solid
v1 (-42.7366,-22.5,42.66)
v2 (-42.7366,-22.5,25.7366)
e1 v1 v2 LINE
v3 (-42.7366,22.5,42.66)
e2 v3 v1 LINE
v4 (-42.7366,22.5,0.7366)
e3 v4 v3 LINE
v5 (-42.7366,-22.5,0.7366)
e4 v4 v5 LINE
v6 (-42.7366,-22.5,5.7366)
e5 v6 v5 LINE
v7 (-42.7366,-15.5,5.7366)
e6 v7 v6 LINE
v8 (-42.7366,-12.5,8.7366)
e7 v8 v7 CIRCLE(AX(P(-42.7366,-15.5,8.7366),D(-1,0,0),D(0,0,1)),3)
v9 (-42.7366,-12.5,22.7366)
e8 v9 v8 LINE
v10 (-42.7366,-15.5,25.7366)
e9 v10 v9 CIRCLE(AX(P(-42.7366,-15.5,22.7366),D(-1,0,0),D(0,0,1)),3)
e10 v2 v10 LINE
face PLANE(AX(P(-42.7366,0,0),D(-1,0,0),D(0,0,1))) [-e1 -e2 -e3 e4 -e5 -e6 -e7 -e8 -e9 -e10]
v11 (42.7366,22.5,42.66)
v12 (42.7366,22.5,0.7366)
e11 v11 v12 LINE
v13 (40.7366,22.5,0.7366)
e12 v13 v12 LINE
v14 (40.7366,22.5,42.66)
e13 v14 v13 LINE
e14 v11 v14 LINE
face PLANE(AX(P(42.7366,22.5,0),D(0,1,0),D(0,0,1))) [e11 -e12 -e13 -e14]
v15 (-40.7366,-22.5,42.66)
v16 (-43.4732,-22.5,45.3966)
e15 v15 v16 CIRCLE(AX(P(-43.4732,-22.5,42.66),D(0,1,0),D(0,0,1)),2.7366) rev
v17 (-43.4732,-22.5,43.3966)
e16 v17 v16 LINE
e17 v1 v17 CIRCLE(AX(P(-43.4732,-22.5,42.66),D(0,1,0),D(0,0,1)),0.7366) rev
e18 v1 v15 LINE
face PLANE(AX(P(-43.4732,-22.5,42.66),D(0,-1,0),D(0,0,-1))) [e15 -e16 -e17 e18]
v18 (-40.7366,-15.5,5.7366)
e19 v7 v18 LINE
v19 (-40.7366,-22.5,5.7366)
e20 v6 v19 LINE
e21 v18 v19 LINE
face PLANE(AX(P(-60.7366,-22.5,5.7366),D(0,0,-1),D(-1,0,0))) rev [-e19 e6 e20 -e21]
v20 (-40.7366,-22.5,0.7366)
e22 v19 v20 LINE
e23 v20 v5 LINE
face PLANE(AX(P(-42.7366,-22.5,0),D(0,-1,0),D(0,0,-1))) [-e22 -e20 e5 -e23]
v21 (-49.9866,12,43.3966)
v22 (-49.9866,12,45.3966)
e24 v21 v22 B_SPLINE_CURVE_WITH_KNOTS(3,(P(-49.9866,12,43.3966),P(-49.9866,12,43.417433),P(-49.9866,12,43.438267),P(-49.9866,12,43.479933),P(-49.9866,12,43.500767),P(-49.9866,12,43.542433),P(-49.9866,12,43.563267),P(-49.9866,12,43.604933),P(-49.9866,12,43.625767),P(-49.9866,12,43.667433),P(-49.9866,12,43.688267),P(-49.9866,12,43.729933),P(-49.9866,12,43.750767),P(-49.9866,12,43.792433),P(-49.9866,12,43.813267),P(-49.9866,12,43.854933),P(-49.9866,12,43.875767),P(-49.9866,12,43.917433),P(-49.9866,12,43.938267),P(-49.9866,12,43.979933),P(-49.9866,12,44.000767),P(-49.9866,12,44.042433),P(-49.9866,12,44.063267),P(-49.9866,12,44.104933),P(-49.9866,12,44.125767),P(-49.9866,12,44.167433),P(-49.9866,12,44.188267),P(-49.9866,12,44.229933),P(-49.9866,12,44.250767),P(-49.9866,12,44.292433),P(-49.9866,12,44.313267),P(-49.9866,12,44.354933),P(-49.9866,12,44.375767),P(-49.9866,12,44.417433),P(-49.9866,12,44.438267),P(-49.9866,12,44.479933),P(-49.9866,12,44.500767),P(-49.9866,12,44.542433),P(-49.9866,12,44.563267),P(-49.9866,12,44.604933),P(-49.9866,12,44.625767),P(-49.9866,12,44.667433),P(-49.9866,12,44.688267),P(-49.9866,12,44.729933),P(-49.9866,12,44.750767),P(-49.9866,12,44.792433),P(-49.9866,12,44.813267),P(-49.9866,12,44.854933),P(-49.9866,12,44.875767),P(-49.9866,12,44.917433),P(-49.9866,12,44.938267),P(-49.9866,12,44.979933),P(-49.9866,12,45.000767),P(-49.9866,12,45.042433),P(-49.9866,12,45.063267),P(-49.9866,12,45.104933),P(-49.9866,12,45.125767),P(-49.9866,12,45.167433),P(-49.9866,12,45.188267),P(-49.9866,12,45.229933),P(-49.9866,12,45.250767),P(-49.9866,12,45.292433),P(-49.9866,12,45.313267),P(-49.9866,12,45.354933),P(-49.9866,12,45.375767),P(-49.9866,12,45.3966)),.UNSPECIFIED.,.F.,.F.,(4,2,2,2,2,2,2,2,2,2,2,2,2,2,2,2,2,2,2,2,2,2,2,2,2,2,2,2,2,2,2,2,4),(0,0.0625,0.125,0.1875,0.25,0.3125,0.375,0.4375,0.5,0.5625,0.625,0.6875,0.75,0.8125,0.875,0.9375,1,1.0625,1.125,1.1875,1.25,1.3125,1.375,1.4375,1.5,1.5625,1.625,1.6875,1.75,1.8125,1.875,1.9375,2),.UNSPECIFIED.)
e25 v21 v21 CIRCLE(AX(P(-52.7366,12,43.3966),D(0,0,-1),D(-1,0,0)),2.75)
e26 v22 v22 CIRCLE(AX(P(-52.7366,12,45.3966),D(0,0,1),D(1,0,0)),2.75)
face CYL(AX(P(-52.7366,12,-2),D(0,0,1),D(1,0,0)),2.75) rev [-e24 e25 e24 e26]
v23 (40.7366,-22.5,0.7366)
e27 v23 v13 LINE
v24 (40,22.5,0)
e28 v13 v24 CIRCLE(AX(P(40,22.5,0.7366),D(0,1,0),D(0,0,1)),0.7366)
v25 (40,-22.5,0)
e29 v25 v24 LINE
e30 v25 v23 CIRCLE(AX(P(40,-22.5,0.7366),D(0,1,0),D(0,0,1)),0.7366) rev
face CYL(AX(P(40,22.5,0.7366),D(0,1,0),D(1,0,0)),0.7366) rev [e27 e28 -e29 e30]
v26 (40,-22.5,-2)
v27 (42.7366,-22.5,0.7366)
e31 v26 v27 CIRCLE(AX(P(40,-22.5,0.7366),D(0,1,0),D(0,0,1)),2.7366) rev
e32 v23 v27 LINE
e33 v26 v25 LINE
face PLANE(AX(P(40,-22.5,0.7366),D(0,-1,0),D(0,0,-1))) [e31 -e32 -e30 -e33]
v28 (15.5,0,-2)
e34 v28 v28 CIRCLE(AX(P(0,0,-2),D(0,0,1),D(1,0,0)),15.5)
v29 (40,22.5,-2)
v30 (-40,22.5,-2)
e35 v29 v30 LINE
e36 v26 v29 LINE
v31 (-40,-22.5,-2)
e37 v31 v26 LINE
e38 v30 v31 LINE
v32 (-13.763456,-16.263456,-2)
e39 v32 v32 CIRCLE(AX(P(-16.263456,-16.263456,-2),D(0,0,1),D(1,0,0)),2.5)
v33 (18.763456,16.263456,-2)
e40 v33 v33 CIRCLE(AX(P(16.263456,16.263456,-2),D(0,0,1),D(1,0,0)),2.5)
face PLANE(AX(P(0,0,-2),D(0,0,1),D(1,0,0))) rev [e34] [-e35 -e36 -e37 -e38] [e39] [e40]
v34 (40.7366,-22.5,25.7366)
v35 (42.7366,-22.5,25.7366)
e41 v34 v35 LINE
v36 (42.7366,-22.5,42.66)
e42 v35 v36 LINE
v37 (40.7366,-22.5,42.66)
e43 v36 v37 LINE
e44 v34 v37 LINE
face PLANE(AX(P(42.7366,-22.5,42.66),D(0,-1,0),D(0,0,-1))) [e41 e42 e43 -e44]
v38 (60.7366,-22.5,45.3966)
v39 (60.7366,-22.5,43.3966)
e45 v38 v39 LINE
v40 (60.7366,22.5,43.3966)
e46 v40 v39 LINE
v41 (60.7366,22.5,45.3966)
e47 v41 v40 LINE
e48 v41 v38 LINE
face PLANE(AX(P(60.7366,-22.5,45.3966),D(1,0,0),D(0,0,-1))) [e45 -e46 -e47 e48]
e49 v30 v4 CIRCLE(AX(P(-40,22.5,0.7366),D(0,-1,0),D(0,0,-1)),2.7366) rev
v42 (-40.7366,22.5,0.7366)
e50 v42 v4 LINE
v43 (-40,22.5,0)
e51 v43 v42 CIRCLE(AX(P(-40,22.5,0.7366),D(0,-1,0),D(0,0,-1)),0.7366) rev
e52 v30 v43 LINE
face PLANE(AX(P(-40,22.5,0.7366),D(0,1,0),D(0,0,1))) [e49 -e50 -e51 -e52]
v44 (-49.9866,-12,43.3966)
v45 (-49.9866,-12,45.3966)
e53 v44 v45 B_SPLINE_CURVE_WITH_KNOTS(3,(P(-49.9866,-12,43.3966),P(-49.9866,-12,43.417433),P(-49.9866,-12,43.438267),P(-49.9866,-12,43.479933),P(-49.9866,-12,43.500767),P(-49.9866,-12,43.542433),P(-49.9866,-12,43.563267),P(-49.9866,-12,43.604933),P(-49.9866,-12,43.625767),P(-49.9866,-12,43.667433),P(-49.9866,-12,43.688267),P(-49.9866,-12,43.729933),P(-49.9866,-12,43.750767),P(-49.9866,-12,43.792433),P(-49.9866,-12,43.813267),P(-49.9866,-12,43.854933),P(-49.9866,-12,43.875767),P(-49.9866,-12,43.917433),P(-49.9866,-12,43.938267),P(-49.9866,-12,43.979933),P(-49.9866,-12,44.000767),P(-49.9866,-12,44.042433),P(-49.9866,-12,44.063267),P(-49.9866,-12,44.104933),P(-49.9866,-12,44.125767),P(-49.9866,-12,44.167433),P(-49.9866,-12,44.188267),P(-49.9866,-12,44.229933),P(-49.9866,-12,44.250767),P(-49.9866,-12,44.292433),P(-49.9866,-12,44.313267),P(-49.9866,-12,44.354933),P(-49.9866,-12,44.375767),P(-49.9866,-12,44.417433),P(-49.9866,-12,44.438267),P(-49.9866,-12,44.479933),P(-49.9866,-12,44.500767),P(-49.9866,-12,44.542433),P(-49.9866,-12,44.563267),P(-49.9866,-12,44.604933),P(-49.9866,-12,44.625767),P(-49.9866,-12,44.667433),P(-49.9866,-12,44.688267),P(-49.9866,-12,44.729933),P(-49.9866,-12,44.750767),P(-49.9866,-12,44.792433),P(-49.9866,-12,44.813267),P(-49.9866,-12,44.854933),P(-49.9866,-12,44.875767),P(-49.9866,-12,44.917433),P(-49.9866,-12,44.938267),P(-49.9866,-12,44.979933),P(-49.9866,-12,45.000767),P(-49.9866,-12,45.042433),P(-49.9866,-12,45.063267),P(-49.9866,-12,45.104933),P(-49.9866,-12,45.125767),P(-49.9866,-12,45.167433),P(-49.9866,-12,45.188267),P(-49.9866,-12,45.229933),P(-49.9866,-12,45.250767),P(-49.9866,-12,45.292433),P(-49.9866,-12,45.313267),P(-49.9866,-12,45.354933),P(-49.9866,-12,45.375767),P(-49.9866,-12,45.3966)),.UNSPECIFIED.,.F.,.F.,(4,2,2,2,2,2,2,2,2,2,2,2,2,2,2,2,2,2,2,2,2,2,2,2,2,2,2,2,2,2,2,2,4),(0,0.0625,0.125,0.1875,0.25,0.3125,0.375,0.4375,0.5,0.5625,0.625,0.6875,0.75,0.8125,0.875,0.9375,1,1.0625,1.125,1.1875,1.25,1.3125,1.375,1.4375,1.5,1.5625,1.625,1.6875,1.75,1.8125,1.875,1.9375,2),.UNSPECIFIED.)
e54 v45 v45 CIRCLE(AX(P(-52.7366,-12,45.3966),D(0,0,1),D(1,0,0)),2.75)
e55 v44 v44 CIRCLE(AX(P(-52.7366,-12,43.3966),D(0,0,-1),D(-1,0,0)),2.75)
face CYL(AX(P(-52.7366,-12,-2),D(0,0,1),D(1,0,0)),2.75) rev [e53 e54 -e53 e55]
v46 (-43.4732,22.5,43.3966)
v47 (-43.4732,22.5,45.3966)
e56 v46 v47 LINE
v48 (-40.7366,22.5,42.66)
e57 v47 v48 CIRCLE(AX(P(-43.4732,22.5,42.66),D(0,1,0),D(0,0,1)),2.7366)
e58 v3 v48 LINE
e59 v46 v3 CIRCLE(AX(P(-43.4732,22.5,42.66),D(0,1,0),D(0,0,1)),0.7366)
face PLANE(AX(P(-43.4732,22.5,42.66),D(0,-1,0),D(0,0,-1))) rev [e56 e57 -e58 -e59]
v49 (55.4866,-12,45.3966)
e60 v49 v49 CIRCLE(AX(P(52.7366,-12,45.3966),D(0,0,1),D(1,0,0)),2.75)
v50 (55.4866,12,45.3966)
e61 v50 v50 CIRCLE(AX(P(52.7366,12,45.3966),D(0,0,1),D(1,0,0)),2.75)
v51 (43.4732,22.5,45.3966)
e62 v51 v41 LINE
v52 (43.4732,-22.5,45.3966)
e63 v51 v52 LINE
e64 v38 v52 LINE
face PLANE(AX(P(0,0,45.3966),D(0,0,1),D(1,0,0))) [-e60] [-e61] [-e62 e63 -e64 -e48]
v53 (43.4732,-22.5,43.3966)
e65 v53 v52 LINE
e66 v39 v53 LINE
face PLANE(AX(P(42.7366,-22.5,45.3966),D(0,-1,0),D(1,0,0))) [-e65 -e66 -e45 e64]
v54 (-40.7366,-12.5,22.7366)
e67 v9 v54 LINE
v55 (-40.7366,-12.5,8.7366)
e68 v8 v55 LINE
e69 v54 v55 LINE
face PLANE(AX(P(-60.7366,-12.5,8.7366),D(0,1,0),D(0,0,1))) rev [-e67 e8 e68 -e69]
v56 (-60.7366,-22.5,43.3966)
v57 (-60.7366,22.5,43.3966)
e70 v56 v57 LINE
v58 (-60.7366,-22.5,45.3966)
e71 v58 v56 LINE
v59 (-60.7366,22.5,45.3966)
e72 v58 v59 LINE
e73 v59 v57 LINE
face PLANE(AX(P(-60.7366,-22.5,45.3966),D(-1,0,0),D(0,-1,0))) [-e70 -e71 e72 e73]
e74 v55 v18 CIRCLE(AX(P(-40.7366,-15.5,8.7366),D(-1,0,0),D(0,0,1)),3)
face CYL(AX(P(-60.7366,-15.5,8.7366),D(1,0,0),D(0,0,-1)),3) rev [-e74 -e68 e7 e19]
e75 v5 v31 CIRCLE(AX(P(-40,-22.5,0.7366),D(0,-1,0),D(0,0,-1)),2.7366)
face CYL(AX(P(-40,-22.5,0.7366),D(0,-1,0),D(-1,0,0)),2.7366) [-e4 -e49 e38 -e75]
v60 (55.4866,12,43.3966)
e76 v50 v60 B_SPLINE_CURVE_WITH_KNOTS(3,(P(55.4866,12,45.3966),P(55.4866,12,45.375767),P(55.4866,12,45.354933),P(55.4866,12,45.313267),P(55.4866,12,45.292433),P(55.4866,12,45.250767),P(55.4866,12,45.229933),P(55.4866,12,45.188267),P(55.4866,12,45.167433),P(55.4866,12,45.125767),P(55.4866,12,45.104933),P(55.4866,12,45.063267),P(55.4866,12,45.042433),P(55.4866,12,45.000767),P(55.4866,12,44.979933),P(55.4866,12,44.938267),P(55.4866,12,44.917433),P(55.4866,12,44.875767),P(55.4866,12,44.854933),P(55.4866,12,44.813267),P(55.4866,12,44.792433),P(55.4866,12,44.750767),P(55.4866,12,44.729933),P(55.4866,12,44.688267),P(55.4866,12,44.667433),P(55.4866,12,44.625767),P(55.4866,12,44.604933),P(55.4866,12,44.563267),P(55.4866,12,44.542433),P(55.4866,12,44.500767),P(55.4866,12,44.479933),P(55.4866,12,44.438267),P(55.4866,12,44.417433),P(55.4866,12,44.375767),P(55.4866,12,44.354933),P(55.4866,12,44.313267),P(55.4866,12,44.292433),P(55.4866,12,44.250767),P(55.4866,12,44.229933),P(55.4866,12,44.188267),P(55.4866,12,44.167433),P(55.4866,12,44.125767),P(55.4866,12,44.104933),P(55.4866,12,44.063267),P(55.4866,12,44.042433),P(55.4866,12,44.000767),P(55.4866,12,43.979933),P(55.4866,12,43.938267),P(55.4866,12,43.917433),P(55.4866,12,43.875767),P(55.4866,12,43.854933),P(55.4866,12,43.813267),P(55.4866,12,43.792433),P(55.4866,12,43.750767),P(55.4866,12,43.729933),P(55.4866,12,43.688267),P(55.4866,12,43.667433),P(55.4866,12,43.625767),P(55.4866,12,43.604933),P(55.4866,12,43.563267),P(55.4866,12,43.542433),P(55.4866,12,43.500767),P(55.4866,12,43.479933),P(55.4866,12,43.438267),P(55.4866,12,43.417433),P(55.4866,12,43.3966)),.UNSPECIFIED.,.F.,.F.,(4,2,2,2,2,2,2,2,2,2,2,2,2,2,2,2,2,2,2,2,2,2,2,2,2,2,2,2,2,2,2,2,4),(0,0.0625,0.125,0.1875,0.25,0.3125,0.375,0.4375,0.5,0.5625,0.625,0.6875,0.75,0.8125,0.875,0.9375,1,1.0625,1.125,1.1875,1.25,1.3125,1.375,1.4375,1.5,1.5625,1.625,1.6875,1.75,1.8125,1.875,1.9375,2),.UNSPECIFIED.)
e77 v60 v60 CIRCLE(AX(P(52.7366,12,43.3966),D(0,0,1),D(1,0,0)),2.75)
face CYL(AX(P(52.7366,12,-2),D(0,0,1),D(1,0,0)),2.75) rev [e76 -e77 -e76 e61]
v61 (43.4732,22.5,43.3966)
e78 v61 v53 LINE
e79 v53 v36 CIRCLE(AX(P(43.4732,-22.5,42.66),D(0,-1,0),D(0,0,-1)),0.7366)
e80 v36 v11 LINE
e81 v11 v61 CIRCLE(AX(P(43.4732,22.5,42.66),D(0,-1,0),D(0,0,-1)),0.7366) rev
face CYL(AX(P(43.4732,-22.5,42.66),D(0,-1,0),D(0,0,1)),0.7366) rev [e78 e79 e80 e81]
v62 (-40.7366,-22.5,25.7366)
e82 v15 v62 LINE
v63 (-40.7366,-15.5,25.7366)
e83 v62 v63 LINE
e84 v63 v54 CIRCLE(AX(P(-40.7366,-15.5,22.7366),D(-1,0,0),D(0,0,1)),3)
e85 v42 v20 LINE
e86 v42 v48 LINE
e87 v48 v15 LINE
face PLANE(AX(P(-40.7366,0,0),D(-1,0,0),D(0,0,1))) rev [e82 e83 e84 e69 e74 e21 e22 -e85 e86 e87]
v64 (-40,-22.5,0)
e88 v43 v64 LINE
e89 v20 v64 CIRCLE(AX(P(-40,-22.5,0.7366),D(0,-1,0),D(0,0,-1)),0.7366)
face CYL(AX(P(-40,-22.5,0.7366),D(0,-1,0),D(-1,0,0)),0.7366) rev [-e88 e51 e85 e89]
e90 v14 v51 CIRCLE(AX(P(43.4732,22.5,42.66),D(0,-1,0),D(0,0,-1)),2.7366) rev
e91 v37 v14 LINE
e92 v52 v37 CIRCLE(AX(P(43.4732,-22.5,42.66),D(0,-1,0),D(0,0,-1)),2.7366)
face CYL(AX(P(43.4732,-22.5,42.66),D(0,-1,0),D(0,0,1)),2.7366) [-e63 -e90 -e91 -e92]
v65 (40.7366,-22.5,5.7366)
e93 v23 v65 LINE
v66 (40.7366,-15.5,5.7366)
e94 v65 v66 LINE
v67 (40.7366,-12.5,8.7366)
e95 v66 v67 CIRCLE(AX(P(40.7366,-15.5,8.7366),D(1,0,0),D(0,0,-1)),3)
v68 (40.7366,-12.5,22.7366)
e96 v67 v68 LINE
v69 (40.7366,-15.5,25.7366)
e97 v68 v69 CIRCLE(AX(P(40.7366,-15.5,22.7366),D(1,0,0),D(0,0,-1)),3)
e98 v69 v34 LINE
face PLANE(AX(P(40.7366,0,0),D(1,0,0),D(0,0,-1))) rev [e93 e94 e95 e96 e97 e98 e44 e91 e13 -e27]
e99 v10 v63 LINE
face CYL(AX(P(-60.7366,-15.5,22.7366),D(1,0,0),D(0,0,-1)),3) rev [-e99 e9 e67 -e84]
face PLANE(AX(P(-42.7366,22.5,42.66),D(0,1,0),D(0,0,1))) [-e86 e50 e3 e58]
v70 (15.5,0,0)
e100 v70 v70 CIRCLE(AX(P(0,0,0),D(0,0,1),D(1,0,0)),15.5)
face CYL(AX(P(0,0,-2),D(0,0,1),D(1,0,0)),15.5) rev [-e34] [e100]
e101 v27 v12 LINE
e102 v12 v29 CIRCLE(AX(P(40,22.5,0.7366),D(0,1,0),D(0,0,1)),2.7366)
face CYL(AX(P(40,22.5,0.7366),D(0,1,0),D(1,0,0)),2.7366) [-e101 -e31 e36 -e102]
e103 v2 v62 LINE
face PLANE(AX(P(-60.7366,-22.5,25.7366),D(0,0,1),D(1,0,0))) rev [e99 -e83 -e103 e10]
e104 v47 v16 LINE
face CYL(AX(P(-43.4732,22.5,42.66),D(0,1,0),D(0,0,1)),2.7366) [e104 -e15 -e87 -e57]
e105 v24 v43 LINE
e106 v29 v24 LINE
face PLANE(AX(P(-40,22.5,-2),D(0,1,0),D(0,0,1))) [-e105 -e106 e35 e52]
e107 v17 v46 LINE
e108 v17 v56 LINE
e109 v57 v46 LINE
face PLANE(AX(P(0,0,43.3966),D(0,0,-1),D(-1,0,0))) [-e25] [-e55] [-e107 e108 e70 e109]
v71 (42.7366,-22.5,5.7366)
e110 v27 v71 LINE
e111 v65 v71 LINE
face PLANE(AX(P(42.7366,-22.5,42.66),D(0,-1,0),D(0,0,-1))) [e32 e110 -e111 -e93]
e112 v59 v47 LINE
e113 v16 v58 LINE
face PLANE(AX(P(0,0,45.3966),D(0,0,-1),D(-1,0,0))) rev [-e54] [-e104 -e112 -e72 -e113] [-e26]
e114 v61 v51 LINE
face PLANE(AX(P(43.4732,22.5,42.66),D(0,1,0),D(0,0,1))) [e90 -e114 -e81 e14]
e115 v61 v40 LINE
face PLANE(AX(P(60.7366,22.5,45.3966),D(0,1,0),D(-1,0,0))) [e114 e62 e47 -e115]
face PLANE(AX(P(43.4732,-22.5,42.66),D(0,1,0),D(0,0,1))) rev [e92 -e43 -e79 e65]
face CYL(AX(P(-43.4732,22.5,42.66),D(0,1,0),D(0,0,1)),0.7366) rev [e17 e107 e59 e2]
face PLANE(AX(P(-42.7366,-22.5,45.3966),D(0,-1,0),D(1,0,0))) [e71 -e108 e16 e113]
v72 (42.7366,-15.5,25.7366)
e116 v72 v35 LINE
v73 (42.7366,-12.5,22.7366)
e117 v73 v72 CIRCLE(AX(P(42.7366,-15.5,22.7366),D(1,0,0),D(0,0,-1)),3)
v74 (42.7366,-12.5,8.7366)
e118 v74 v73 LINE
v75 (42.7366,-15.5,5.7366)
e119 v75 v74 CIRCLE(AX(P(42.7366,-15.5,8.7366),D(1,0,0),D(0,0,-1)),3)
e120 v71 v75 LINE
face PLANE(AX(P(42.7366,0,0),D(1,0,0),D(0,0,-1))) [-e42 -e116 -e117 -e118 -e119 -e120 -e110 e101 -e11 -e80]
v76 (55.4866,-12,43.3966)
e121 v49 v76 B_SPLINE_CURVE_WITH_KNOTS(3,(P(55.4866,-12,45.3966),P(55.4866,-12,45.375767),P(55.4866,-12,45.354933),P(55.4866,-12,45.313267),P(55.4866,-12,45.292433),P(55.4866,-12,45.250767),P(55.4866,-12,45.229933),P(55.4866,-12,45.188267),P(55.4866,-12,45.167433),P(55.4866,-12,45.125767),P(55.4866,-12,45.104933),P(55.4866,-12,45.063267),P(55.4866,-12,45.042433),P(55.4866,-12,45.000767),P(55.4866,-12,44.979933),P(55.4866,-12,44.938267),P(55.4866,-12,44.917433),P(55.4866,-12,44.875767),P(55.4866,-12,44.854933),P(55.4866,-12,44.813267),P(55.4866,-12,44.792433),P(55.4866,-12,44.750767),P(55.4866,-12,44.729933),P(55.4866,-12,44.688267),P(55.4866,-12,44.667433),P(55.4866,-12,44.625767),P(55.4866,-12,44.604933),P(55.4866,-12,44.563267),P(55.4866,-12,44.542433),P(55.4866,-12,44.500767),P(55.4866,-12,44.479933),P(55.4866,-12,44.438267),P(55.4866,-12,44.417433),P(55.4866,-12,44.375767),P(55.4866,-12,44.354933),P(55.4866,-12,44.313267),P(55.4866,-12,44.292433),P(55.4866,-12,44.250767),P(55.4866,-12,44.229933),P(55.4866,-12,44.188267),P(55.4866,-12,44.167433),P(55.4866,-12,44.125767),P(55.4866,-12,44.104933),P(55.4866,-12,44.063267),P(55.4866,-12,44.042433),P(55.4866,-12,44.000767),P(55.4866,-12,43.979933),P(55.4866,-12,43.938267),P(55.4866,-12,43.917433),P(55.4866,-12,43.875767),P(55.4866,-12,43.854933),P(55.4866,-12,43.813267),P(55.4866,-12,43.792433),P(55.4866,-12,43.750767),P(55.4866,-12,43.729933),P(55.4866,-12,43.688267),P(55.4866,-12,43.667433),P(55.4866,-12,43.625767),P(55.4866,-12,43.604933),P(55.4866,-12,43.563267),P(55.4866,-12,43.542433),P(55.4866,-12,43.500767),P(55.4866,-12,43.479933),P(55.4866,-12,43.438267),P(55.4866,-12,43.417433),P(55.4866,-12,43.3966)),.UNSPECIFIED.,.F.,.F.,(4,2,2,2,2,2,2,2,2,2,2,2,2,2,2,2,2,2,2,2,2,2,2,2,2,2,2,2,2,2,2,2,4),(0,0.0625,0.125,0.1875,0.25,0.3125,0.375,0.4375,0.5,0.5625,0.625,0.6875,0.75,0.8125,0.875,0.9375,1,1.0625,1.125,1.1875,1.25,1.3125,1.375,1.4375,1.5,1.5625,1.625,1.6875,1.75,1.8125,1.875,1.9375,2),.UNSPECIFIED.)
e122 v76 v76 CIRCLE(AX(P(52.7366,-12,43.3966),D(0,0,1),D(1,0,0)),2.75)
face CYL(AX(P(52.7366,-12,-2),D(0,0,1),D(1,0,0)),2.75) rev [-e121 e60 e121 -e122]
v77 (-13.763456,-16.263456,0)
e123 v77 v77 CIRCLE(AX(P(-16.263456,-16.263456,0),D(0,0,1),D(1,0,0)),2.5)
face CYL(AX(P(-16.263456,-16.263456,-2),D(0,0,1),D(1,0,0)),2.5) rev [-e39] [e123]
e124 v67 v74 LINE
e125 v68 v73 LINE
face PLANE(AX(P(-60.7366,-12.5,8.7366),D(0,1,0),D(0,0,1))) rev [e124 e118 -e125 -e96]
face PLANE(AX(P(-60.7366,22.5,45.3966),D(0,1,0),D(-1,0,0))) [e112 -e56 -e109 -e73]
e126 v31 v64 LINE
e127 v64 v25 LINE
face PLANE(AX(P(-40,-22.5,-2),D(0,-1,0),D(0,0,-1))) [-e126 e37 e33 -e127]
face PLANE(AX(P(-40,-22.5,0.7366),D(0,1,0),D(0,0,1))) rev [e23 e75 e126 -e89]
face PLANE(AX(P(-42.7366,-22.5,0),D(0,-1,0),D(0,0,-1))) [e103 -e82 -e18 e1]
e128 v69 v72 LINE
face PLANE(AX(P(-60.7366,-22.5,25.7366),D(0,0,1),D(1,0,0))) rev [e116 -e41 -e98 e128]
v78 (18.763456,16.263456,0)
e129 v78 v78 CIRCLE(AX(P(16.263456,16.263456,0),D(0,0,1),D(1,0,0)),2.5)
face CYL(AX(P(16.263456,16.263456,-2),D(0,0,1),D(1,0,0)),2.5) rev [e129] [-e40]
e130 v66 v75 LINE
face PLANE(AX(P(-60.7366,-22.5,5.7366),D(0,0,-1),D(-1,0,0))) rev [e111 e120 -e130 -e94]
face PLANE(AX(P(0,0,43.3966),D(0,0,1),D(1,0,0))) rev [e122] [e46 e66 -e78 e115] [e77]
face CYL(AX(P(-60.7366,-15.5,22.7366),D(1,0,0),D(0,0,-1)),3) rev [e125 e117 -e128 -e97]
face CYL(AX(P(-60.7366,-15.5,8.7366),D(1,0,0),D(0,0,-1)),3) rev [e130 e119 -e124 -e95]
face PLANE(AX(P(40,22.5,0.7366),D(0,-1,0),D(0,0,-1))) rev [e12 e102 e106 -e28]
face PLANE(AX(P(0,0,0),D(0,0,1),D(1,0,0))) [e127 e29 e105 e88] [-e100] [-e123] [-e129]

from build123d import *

# Parameters (mm, degrees)
SKETCH2_W               = 80
SKETCH2_H               = 45
BASE_FLANGE1_DEPTH      = 2
EDGE_FLANGE1_DEPTH      = 45
EDGE_FLANGE2_DEPTH      = 45
SKETCH13_R              = 15.5
CUT_EXTRUDE1_DEPTH      = 65.440224857
SKETCH14_R              = 2.5
CUT_EXTRUDE2_DEPTH      = 65.440224857
EDGE_FLANGE3_DEPTH      = 45
EDGE_FLANGE3_BEND_DEPTH = 45
SKETCH21_R              = 2.75
CUT_EXTRUDE3_DEPTH      = 81.259717612
CUT_EXTRUDE4_DEPTH      = 116.211997682


# Sheet-metal steps are written as plain solids
with BuildPart() as part:
    # Sketch2 → Base-Flange1 (new body)
    with BuildSketch(Plane.XY):
        Rectangle(SKETCH2_W, SKETCH2_H)
    extrude(amount=-BASE_FLANGE1_DEPTH)

    # Edge-Flange1 section (across the edge) → Edge-Flange1 (add)
    with BuildSketch(Plane(origin=(40.7366, -22.5, 0), x_dir=(-1, 0, 0), z_dir=(0, 1, 0))):
        with BuildLine():
            Line((-2, 0.7366), (-2, 42.66))
            Line((-2, 42.66), (0, 42.66))
            Line((0, 42.66), (0, 0.7366))
            ThreePointArc((0, 0.7366), (0.215745145, 0.215745145), (0.7366, 0))
            Line((0.7366, 0), (0.7366, -2))
            ThreePointArc((0.7366, -2), (-1.198468417, -1.198468417), (-2, 0.7366))
        make_face()
    extrude(amount=EDGE_FLANGE1_DEPTH)

    # Edge-Flange2 section (across the edge) → Edge-Flange2 (add)
    with BuildSketch(Plane(origin=(-40.7366, 22.5, 0), x_dir=(1, 0, 0), z_dir=(0, -1, 0))):
        with BuildLine():
            Line((-2, 0.7366), (-2, 42.66))
            Line((-2, 42.66), (0, 42.66))
            Line((0, 42.66), (0, 0.7366))
            ThreePointArc((0, 0.7366), (0.215745145, 0.215745145), (0.7366, 0))
            Line((0.7366, 0), (0.7366, -2))
            ThreePointArc((0.7366, -2), (-1.198468417, -1.198468417), (-2, 0.7366))
        make_face()
    extrude(amount=EDGE_FLANGE2_DEPTH)

    # Sketch13 → Cut-Extrude1 (cut, through all)
    with BuildSketch(Plane.XY):
        Circle(SKETCH13_R)
    extrude(amount=-CUT_EXTRUDE1_DEPTH, mode=Mode.SUBTRACT)

    # Sketch14 → Cut-Extrude2 (cut, through all)
    with BuildSketch(Plane.XY):
        with Locations((-16.263455967, -16.263455967)):
            Circle(SKETCH14_R)
        with Locations((16.263455967, 16.263455967)):
            Circle(SKETCH14_R)
    extrude(amount=-CUT_EXTRUDE2_DEPTH, mode=Mode.SUBTRACT)

    # Edge-Flange3 section (across the edge) → Edge-Flange3 (add)
    with BuildSketch(Plane(origin=(42.7366, 22.5, 43.3966), x_dir=(0, 0, -1), z_dir=(0, -1, 0))):
        with BuildLine():
            Line((-2, 0.7366), (-2, 18))
            Line((-2, 18), (0, 18))
            Line((0, 18), (0, 0.7366))
            ThreePointArc((0, 0.7366), (0.215745145, 0.215745145), (0.7366, 0))
            Line((0.7366, 0), (0.7366, -2))
            ThreePointArc((0.7366, -2), (-1.198468417, -1.198468417), (-2, 0.7366))
        make_face()
    extrude(amount=EDGE_FLANGE3_DEPTH)

    # Edge-Flange3 section 2 (across the edge) → Edge-Flange3 bend (add)
    with BuildSketch(Plane(origin=(-42.7366, -22.5, 43.3966), x_dir=(0, 0, -1), z_dir=(0, 1, 0))):
        with BuildLine():
            Line((-2, 0.7366), (-2, 18))
            Line((-2, 18), (0, 18))
            Line((0, 18), (0, 0.7366))
            ThreePointArc((0, 0.7366), (0.215745145, 0.215745145), (0.7366, 0))
            Line((0.7366, 0), (0.7366, -2))
            ThreePointArc((0.7366, -2), (-1.198468417, -1.198468417), (-2, 0.7366))
        make_face()
    extrude(amount=EDGE_FLANGE3_BEND_DEPTH)

    # Sketch21 → Cut-Extrude3 (cut, through all)
    with BuildSketch(Plane.XY.offset(45.3966)):
        with Locations((52.7366, 12)):
            Circle(SKETCH21_R)
        with Locations((52.7366, -12)):
            Circle(SKETCH21_R)
        with Locations((-52.7366, 12)):
            Circle(SKETCH21_R)
        with Locations((-52.7366, -12)):
            Circle(SKETCH21_R)
    extrude(amount=-CUT_EXTRUDE3_DEPTH, mode=Mode.SUBTRACT)

    # Sketch22 → Cut-Extrude4 (cut, through all)
    with BuildSketch(Plane(origin=(42.7366, 0, 0), x_dir=(0, 0, -1), z_dir=(1, 0, 0))):
        with BuildLine():
            Line((-5.7366, -22.5), (-25.7366, -22.5))
            Line((-25.7366, -22.5), (-25.7366, -15.5))
            ThreePointArc((-25.7366, -15.5), (-24.857920344, -13.378679656), (-22.7366, -12.5))
            Line((-22.7366, -12.5), (-8.7366, -12.5))
            ThreePointArc((-8.7366, -12.5), (-6.615279656, -13.378679656), (-5.7366, -15.5))
            Line((-5.7366, -15.5), (-5.7366, -22.5))
        make_face()
    extrude(amount=-CUT_EXTRUDE4_DEPTH, mode=Mode.SUBTRACT)


solid = part.part
